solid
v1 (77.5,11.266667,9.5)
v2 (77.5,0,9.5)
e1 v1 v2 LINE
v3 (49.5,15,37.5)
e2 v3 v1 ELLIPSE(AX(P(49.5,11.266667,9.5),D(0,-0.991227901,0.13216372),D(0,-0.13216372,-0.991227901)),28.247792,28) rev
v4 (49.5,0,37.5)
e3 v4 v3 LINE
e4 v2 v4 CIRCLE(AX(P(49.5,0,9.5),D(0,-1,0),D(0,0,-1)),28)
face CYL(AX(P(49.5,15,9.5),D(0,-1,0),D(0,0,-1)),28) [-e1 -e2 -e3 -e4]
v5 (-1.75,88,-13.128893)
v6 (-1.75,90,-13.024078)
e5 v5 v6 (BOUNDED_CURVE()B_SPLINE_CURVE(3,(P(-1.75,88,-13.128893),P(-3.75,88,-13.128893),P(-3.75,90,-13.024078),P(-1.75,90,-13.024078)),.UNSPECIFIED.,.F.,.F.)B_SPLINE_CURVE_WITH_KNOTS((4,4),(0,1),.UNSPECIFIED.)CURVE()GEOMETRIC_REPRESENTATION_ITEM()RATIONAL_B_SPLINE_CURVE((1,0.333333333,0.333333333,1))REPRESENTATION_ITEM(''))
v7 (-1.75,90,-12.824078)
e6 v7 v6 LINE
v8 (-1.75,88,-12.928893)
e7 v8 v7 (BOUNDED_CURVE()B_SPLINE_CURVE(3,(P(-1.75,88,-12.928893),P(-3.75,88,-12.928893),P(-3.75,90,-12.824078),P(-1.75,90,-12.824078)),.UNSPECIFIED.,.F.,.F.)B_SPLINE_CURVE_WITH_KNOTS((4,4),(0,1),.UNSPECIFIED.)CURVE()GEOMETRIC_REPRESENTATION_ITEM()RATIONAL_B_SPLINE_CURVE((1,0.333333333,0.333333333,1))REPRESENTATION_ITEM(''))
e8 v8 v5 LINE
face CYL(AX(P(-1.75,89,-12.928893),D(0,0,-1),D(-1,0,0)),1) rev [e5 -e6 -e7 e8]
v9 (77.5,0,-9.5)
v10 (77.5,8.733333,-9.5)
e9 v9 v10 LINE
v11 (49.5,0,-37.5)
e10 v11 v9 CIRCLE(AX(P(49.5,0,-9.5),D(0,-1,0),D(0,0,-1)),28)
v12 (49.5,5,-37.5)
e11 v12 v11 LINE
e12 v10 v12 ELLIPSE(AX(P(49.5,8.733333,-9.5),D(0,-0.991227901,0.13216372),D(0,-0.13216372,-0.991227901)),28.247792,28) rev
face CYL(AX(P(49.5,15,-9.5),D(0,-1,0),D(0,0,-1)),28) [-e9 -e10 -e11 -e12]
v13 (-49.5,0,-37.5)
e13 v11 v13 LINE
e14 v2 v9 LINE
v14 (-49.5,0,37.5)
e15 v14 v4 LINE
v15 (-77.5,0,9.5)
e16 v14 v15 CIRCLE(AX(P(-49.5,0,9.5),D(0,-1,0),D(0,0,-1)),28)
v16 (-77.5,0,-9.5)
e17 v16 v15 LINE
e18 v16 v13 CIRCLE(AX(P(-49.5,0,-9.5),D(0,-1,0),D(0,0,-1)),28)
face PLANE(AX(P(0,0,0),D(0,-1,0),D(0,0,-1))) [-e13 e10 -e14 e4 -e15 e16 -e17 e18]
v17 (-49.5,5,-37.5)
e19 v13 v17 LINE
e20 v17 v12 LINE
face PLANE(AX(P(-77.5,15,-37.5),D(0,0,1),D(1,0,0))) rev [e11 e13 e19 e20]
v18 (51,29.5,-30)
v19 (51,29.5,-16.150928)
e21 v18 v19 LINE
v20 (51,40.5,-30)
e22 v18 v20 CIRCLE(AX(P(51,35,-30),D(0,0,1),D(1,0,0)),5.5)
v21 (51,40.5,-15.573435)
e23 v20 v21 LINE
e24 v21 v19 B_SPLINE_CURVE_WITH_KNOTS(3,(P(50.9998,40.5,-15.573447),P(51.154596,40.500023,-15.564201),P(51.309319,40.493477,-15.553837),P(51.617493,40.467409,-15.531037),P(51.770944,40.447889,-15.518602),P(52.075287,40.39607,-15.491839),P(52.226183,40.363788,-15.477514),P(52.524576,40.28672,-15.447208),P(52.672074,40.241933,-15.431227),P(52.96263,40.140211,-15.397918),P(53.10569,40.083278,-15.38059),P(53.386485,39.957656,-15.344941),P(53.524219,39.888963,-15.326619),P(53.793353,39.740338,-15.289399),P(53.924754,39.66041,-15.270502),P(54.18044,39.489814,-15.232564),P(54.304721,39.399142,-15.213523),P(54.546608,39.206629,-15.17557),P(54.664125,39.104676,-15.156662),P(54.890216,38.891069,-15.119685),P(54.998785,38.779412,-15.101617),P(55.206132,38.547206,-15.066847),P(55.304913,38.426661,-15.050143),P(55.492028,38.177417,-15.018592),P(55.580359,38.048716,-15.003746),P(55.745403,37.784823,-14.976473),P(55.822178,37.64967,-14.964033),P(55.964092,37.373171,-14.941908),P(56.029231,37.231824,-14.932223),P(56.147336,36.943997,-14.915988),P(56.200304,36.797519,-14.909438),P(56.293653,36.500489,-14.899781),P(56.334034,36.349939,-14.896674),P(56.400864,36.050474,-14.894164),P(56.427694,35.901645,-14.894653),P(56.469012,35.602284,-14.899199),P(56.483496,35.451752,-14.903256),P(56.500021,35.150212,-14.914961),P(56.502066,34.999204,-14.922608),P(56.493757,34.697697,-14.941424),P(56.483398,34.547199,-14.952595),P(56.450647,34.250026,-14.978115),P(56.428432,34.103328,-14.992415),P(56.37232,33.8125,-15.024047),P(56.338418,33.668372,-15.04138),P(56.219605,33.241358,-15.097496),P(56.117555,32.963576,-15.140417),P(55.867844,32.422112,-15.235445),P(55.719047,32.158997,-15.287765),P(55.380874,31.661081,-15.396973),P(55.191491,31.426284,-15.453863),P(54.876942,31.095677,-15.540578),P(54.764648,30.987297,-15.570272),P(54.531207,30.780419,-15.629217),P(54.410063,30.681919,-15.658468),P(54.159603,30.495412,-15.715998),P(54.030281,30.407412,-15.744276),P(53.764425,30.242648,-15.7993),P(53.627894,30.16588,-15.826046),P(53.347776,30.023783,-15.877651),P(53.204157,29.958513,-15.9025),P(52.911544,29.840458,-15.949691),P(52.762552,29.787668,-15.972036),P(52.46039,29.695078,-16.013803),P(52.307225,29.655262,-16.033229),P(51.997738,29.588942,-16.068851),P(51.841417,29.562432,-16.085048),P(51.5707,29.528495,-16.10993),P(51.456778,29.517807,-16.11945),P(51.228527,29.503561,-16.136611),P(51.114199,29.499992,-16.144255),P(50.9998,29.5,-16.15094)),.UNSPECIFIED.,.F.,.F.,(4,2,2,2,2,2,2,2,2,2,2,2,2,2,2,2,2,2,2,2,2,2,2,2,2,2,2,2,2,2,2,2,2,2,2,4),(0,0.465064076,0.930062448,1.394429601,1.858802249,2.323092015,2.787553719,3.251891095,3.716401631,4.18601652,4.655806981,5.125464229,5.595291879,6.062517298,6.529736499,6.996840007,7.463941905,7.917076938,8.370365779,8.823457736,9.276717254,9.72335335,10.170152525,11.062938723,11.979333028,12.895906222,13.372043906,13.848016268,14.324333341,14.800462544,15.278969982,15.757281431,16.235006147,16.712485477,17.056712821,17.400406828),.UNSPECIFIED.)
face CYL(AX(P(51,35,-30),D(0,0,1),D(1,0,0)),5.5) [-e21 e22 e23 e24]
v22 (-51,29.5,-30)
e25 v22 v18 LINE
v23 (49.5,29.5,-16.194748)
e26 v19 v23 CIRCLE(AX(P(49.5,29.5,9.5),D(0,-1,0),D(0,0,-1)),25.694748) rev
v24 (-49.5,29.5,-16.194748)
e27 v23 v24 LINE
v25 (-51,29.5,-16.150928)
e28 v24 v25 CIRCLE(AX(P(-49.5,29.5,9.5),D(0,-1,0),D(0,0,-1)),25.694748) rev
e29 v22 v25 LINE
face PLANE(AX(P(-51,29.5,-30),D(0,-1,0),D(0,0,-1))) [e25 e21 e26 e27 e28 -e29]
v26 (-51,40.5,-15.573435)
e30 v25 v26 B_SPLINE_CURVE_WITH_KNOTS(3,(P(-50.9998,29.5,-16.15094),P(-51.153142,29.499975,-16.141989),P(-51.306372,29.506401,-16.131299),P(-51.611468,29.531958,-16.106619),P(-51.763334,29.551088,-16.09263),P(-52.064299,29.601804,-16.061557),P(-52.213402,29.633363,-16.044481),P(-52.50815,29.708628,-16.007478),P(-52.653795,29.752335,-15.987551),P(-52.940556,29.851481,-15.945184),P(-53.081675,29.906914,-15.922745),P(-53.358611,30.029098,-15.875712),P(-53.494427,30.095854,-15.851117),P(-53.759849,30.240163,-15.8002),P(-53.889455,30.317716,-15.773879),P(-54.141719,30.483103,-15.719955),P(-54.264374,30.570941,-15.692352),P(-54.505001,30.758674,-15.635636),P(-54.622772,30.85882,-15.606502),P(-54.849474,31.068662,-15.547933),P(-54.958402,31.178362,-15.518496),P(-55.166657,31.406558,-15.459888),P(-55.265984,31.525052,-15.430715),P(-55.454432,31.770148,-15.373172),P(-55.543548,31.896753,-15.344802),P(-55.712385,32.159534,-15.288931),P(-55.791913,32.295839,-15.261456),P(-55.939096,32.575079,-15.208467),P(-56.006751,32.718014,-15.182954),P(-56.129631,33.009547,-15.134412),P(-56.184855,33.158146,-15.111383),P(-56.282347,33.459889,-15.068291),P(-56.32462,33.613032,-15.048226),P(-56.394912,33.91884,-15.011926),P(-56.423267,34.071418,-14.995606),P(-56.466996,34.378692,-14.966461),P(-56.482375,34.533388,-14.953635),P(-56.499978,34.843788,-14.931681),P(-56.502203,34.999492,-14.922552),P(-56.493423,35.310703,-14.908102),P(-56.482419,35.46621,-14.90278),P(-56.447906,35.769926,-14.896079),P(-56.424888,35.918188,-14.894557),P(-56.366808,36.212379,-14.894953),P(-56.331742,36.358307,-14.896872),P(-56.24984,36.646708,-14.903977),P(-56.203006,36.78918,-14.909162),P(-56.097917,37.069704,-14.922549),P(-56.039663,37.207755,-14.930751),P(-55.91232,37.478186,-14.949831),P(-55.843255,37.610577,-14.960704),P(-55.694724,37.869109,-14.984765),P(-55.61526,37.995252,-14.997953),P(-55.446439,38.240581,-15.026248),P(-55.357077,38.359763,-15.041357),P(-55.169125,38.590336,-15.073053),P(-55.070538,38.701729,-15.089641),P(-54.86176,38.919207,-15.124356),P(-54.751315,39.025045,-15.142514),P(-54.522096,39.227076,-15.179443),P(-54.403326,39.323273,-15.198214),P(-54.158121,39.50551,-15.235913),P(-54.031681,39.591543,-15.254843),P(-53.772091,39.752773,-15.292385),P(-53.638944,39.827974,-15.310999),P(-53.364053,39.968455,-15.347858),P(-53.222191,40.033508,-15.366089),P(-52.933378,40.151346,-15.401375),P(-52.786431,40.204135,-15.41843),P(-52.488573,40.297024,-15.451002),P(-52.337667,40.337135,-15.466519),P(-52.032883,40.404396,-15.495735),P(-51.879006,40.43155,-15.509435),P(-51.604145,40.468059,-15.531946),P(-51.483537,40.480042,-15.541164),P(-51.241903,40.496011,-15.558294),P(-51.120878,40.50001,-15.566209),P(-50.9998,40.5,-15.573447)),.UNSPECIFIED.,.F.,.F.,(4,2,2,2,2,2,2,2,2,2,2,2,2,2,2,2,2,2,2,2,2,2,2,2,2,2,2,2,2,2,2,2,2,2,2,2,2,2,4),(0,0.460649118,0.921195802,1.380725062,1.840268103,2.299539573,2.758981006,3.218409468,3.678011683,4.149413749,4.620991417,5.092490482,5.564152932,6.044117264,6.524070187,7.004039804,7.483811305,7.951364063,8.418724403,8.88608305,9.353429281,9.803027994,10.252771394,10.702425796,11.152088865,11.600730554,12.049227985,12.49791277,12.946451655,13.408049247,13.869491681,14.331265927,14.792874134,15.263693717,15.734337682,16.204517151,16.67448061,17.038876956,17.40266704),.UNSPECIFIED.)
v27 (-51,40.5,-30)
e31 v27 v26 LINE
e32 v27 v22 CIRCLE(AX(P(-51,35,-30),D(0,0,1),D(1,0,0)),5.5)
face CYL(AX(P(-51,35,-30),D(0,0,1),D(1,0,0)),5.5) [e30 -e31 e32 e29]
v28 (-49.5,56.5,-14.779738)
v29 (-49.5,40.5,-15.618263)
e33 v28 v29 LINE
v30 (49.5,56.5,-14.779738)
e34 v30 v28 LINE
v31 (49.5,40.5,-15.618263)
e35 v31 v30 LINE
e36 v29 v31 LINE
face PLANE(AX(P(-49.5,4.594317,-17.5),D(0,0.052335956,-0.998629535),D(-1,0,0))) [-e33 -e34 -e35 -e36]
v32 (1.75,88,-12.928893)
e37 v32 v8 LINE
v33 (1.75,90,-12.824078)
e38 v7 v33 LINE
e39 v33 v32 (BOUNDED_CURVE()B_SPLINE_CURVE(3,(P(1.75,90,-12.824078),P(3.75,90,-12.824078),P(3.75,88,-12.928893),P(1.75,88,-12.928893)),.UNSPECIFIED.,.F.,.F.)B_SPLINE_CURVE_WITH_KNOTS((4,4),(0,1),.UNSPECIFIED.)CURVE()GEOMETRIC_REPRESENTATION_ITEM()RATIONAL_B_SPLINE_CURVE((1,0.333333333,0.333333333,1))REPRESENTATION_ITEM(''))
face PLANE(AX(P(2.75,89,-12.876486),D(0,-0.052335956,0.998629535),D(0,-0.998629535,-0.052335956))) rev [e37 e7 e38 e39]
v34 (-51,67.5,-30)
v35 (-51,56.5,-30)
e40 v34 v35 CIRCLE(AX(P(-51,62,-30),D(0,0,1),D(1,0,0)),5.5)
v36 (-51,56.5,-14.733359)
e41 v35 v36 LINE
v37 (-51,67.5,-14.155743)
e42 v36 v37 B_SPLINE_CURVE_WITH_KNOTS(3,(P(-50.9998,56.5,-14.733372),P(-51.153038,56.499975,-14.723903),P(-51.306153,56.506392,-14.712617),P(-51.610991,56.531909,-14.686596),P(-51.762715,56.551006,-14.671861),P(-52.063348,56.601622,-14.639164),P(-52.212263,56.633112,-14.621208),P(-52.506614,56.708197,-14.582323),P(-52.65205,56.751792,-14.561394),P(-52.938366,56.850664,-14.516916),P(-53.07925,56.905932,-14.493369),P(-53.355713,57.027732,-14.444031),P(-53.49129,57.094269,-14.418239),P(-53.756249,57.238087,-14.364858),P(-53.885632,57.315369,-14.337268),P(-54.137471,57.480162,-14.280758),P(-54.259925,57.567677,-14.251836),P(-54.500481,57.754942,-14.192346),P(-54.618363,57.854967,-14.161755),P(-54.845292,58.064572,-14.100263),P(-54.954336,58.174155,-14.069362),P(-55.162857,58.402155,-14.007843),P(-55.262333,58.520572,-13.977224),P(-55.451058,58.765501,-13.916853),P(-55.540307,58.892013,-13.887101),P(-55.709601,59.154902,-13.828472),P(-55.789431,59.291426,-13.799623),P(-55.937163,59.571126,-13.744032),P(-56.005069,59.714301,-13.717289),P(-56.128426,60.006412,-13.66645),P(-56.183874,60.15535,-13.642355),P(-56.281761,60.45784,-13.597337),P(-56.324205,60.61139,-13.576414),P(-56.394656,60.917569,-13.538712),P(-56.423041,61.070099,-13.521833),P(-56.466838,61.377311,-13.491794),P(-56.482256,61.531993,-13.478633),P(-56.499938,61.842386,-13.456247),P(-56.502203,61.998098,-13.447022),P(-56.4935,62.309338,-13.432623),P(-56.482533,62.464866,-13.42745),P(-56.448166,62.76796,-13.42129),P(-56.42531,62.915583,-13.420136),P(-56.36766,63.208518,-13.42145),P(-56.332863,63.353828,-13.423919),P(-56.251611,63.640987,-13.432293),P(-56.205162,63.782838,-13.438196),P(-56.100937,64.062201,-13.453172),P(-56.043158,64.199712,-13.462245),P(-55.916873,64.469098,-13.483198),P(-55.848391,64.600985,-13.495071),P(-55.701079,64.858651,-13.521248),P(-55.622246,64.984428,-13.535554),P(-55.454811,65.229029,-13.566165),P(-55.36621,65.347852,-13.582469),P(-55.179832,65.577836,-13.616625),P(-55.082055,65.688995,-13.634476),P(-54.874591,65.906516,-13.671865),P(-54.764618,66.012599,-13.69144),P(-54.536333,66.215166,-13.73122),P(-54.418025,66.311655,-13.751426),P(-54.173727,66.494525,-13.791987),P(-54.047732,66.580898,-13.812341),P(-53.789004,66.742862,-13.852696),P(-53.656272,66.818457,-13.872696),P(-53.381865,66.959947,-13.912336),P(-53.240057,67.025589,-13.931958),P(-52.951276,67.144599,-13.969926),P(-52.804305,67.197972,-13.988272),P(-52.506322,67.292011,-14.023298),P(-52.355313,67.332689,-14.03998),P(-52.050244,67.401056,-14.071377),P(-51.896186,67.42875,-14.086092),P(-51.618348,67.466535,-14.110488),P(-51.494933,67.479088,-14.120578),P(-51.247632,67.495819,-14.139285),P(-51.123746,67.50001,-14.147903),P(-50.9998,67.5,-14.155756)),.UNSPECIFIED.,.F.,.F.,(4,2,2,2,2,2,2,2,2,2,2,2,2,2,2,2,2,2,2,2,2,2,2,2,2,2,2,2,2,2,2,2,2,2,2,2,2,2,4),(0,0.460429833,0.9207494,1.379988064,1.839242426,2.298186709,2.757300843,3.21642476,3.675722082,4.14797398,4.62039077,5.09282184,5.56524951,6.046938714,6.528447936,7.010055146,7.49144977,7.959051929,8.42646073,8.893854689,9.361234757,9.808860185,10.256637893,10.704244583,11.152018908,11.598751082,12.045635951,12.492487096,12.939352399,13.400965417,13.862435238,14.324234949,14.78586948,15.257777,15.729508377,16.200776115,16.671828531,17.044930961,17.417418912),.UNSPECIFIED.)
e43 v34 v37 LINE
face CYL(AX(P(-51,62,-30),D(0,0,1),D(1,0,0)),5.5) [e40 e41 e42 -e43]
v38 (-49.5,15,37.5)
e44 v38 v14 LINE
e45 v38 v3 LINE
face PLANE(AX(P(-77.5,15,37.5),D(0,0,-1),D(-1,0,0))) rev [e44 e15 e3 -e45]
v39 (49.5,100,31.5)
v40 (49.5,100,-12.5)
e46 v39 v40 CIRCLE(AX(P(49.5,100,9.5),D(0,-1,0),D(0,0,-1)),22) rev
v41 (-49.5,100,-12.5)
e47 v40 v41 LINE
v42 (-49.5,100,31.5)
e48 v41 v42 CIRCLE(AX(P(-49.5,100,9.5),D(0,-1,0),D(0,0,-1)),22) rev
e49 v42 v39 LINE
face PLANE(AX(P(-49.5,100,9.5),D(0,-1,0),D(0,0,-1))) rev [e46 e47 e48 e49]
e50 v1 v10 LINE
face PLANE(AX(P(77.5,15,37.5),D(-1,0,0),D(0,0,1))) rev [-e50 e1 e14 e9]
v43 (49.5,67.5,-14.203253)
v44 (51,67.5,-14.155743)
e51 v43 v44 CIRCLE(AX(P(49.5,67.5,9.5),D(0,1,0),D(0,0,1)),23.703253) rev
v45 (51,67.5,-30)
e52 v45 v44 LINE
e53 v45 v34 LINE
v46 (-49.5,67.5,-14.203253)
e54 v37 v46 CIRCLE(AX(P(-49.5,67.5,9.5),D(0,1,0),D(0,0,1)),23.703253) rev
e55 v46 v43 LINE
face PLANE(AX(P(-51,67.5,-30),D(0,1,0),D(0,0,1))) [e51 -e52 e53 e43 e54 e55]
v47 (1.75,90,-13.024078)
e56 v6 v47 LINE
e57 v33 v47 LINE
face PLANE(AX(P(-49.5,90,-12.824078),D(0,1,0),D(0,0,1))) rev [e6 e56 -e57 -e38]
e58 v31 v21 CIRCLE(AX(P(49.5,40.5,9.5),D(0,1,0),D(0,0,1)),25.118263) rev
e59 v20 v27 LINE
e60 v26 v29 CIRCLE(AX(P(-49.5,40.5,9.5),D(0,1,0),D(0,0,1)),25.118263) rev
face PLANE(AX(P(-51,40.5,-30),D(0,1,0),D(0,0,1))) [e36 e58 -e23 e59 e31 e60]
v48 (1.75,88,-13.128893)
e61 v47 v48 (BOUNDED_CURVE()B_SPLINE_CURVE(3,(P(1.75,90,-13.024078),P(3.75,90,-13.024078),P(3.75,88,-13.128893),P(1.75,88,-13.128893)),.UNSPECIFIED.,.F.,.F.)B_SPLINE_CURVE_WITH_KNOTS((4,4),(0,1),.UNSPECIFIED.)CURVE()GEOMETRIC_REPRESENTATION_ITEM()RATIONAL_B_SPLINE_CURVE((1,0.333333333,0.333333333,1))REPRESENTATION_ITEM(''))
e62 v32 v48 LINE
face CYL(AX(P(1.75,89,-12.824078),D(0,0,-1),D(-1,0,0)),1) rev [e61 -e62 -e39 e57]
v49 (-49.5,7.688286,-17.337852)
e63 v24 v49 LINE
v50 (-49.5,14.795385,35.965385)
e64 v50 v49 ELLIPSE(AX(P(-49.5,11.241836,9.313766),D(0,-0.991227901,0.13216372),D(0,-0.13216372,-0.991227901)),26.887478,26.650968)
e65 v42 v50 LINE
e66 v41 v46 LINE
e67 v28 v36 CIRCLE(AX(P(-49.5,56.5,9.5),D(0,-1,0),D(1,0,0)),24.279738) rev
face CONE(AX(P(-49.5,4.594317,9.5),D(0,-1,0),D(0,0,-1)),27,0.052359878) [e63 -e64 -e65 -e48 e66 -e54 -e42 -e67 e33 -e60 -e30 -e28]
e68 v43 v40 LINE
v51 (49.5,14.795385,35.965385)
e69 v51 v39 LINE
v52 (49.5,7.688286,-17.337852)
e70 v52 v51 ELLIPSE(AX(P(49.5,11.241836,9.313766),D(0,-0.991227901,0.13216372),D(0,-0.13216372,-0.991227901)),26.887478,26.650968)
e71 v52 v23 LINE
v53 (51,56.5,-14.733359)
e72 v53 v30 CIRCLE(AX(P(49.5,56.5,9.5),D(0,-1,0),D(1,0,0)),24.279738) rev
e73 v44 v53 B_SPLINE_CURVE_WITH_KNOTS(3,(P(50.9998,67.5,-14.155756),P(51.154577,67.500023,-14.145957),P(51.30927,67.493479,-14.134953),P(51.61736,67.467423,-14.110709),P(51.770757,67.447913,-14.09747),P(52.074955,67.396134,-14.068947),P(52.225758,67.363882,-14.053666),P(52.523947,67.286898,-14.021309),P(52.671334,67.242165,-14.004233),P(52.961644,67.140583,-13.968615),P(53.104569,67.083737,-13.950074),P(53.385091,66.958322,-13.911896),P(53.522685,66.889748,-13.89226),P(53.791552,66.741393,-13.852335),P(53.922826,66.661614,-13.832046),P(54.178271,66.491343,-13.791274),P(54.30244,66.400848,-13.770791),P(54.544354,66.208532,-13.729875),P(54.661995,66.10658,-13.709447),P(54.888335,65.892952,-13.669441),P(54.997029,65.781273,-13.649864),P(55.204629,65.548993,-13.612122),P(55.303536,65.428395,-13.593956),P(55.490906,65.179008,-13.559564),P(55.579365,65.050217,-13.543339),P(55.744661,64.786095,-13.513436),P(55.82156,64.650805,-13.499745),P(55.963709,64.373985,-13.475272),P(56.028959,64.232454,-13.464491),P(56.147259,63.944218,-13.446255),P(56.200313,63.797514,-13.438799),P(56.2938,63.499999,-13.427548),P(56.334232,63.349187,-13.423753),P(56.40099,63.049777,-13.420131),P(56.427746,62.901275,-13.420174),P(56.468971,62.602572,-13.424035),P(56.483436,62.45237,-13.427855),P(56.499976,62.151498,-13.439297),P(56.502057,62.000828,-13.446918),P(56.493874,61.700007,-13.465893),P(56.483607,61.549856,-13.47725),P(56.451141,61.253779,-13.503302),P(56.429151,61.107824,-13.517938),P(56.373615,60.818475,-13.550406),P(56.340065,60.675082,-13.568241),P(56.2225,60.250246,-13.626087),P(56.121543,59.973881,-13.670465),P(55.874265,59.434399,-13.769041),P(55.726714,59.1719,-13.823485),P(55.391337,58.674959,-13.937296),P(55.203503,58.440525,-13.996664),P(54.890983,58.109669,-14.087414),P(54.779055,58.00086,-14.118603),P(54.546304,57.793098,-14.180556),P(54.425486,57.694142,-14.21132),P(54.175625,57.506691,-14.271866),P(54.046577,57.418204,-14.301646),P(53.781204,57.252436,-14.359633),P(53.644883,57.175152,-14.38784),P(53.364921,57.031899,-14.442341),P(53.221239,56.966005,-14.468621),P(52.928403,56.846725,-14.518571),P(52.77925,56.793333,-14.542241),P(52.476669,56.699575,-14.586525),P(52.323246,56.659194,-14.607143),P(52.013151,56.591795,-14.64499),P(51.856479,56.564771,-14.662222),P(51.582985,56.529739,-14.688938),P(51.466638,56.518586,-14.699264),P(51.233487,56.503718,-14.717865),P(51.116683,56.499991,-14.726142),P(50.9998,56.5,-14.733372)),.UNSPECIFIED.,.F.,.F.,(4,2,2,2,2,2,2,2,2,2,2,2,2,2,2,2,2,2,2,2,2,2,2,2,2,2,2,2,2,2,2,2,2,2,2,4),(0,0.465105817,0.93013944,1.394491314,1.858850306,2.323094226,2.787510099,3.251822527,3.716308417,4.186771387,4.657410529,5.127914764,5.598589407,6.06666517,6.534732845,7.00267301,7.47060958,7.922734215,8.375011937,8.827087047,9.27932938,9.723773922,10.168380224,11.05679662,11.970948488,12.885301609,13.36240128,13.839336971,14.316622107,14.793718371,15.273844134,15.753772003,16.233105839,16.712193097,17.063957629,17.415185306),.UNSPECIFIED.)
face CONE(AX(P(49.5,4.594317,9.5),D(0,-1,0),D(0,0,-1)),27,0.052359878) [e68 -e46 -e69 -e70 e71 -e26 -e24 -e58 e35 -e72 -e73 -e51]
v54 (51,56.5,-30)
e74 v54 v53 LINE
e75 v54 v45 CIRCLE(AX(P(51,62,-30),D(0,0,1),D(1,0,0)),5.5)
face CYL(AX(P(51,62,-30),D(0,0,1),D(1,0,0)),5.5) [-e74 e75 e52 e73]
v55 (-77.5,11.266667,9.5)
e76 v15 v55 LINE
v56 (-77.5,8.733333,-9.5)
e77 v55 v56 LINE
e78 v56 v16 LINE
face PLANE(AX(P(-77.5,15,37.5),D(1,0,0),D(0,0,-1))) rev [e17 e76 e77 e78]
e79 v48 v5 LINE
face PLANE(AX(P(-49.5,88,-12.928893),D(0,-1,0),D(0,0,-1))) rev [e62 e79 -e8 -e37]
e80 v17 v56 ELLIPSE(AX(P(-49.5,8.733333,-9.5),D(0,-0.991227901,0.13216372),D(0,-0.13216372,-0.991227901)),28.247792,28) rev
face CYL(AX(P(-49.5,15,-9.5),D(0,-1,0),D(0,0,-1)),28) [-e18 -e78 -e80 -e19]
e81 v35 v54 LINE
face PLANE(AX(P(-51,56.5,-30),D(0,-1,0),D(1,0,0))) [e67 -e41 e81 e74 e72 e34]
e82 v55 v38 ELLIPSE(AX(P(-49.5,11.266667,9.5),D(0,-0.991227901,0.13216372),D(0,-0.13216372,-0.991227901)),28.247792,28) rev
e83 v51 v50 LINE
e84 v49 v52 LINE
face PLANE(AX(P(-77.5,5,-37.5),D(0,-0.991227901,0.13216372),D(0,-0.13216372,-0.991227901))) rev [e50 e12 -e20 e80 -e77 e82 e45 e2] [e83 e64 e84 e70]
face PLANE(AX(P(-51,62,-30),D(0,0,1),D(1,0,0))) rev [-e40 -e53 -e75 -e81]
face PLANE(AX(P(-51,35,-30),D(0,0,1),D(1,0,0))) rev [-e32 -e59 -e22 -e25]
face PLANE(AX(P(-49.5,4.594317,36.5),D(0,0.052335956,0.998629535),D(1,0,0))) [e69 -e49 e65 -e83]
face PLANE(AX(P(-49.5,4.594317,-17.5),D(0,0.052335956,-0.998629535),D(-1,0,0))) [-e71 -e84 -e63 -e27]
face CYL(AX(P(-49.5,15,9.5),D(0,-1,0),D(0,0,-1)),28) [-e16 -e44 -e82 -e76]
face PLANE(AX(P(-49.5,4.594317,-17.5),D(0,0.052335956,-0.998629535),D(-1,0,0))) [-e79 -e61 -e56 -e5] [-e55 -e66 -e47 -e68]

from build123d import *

# Parameters (mm, degrees)
SKETCH_2_W          = 155
SKETCH_2_H          = 75
EXTRUDE_1_DEPTH     = 15
CUT_EXTRUDE_1_DEPTH = 161.175684796
FILLET_1_R          = 28
EXTRUDE_2_DEPTH     = 100
CHAMFER_1_SIZE      = 95.405683439
CHAMFER_1_SIZE_2    = 5
EXTRUDE_3_DEPTH     = 30
CUT_EXTRUDE_4_REACH = 145.596


with BuildPart() as part:
    # 스케치2 → 보스-돌출1 (new body)
    with BuildSketch(Plane(origin=(0, 0, 0), x_dir=(1, 0, 0), z_dir=(0, 1, 0))):
        Rectangle(SKETCH_2_W, SKETCH_2_H)
    extrude(amount=EXTRUDE_1_DEPTH)

    # 스케치3 → 컷-돌출1 (cut, through all)
    with BuildSketch(Plane(origin=(77.5, 0, 0), x_dir=(0, 0, -1), z_dir=(1, 0, 0))):
        Polygon((37.5, 5), (-37.5, 15), (37.5, 15), align=None)
    extrude(amount=-CUT_EXTRUDE_1_DEPTH, mode=Mode.SUBTRACT)

    # 필렛1
    fillet_1_edges = [part.edges().sort_by_distance(p)[0] for p in [
        (-77.5, 2.5, -37.5),
        (77.5, 2.5, -37.5),
        (77.5, 7.5, 37.5),
        (-77.5, 7.5, 37.5),
    ]]
    fillet(fillet_1_edges, radius=FILLET_1_R)

    # 스케치4 → 보스-돌출2 (add)
    with BuildSketch(Plane.XZ):
        with BuildLine():
            Line((-49.5, 36.5), (49.5, 36.5))
            ThreePointArc((49.5, 36.5), (76.5, 9.5), (49.5, -17.5))
            Line((49.5, -17.5), (-49.5, -17.5))
            ThreePointArc((-49.5, -17.5), (-76.5, 9.5), (-49.5, 36.5))
        make_face()
    extrude(amount=-EXTRUDE_2_DEPTH)

    # 모따기1
    # the kernel refuses this chamfer: 95.405683439, 5 mm, written as the material it takes off along each edge
    with BuildSketch(Plane(origin=(-49.5, 100, 36.5), x_dir=(0, -0.9999979738662977, 0.0020130234223821315), z_dir=(1, 0, 0))) as chamfer_1_piece_1_section:
        Polygon((CHAMFER_1_SIZE * 0.999997973863, CHAMFER_1_SIZE * 0.00201302342237), (-CHAMFER_1_SIZE_2 * 0.00201302342238, CHAMFER_1_SIZE_2 * 0.999997973866), (0, 0), align=None)
    chamfer_1_piece_1 = extrude(amount=99, mode=Mode.PRIVATE)
    chamfer_1_piece_1 = split(chamfer_1_piece_1, bisect_by=Plane(origin=(0, 15.586966884, 41.90225163), z_dir=(0, 0.9912279006826347, -0.13216372009101798)), keep=Keep.TOP, mode=Mode.PRIVATE)
    add(chamfer_1_piece_1, mode=Mode.SUBTRACT)
    with BuildSketch(Plane(origin=(-49.5, 100, 9.5), x_dir=(0, 0, -1), z_dir=(1, 0, 0))) as chamfer_1_piece_2_section:
        Polygon((27, -CHAMFER_1_SIZE), (27 - CHAMFER_1_SIZE_2, 0), (27, 0), align=None)
    chamfer_1_piece_2 = revolve(axis=Axis((-49.5, 100, 9.5), (0, 1, 0)), revolution_arc=180, mode=Mode.PRIVATE)
    chamfer_1_piece_2 = split(chamfer_1_piece_2, bisect_by=Plane(origin=(-74.18479248, 12.010621427, 15.0796607), z_dir=(0, 0.9912279006826347, -0.13216372009101798)), keep=Keep.TOP, mode=Mode.PRIVATE)
    add(chamfer_1_piece_2, mode=Mode.SUBTRACT)
    with BuildSketch(Plane(origin=(49.5, 100, 9.5), x_dir=(0, 0, 1), z_dir=(-1, 0, 0))) as chamfer_1_piece_3_section:
        Polygon((27, -CHAMFER_1_SIZE), (27 - CHAMFER_1_SIZE_2, 0), (27, 0), align=None)
    chamfer_1_piece_3 = revolve(axis=Axis((49.5, 100, 9.5), (0, 1, 0)), revolution_arc=180, mode=Mode.PRIVATE)
    chamfer_1_piece_3 = split(chamfer_1_piece_3, bisect_by=Plane(origin=(74.18479248, 12.010621427, 15.0796607), z_dir=(0, 0.9912279006826347, -0.13216372009101798)), keep=Keep.TOP, mode=Mode.PRIVATE)
    add(chamfer_1_piece_3, mode=Mode.SUBTRACT)
    with BuildSketch(Plane(origin=(49.5, 100, -17.5), x_dir=(0, -0.9999979738662977, -0.0020130234223820955), z_dir=(-1, 0, 0))) as chamfer_1_piece_4_section:
        Polygon((CHAMFER_1_SIZE * 0.999997973863, CHAMFER_1_SIZE * 0.00201302342237), (-CHAMFER_1_SIZE_2 * 0.00201302342238, CHAMFER_1_SIZE_2 * 0.999997973866), (0, 0), align=None)
    chamfer_1_piece_4 = extrude(amount=99, mode=Mode.PRIVATE)
    chamfer_1_piece_4 = split(chamfer_1_piece_4, bisect_by=Plane(origin=(0, 8.9149356, -8.137983001), z_dir=(0, 0.9912279006826347, -0.13216372009101798)), keep=Keep.TOP, mode=Mode.PRIVATE)
    add(chamfer_1_piece_4, mode=Mode.SUBTRACT)

    # 스케치6 → 보스-돌출3 (add)
    with BuildSketch(Plane.XY):
        with BuildLine():
            Line((-51, 67.5), (51, 67.5))
            ThreePointArc((51, 67.5), (56.5, 62), (51, 56.5))
            Line((51, 56.5), (-51, 56.5))
            ThreePointArc((-51, 56.5), (-56.5, 62), (-51, 67.5))
        make_face()
        with BuildLine():
            Line((-51, 40.5), (51, 40.5))
            ThreePointArc((51, 40.5), (56.5, 35), (51, 29.5))
            Line((51, 29.5), (-51, 29.5))
            ThreePointArc((-51, 29.5), (-56.5, 35), (-51, 40.5))
        make_face()
    extrude(amount=-EXTRUDE_3_DEPTH)

    # 컷-돌출4: from a plane face, 145.596 long prism both ways, kept between that surface and its translate by the depth
    cut_extrude_4_start = Plane(origin=(-49.5, 4.594316561, -17.5), z_dir=(0, 0.05233595624294105, -0.998629534754574)) * Box(584.384, 584.384, 292.192, align=(Align.CENTER, Align.CENTER, Align.MIN), mode=Mode.PRIVATE)
    cut_extrude_4_end = Plane(origin=(-49.5, 4.594316561, -17.3), z_dir=(0, 0.05233595624294105, -0.998629534754574)) * Box(584.384, 584.384, 292.192, align=(Align.CENTER, Align.CENTER, Align.MIN), mode=Mode.PRIVATE)
    # 스케치8 → 컷-돌출4 (cut, from a surface)
    with BuildSketch(Plane(origin=(0, 0, -30), x_dir=(-1, 0, 0), z_dir=(0, 0, -1)), mode=Mode.PRIVATE) as cut_extrude_4_sk1:
        with BuildLine():
            Line((-1.75, 90), (1.75, 90))
            ThreePointArc((1.75, 90), (2.75, 89), (1.75, 88))
            Line((1.75, 88), (-1.75, 88))
            ThreePointArc((-1.75, 88), (-2.75, 89), (-1.75, 90))
        make_face()
    cut_extrude_4_tool1 = extrude(cut_extrude_4_sk1.sketch, amount=CUT_EXTRUDE_4_REACH, both=True, mode=Mode.PRIVATE)
    add(((cut_extrude_4_tool1 - cut_extrude_4_start) & cut_extrude_4_end).solids().sort_by_distance((0, 89, -12.976486))[0], mode=Mode.SUBTRACT)


solid = part.part
